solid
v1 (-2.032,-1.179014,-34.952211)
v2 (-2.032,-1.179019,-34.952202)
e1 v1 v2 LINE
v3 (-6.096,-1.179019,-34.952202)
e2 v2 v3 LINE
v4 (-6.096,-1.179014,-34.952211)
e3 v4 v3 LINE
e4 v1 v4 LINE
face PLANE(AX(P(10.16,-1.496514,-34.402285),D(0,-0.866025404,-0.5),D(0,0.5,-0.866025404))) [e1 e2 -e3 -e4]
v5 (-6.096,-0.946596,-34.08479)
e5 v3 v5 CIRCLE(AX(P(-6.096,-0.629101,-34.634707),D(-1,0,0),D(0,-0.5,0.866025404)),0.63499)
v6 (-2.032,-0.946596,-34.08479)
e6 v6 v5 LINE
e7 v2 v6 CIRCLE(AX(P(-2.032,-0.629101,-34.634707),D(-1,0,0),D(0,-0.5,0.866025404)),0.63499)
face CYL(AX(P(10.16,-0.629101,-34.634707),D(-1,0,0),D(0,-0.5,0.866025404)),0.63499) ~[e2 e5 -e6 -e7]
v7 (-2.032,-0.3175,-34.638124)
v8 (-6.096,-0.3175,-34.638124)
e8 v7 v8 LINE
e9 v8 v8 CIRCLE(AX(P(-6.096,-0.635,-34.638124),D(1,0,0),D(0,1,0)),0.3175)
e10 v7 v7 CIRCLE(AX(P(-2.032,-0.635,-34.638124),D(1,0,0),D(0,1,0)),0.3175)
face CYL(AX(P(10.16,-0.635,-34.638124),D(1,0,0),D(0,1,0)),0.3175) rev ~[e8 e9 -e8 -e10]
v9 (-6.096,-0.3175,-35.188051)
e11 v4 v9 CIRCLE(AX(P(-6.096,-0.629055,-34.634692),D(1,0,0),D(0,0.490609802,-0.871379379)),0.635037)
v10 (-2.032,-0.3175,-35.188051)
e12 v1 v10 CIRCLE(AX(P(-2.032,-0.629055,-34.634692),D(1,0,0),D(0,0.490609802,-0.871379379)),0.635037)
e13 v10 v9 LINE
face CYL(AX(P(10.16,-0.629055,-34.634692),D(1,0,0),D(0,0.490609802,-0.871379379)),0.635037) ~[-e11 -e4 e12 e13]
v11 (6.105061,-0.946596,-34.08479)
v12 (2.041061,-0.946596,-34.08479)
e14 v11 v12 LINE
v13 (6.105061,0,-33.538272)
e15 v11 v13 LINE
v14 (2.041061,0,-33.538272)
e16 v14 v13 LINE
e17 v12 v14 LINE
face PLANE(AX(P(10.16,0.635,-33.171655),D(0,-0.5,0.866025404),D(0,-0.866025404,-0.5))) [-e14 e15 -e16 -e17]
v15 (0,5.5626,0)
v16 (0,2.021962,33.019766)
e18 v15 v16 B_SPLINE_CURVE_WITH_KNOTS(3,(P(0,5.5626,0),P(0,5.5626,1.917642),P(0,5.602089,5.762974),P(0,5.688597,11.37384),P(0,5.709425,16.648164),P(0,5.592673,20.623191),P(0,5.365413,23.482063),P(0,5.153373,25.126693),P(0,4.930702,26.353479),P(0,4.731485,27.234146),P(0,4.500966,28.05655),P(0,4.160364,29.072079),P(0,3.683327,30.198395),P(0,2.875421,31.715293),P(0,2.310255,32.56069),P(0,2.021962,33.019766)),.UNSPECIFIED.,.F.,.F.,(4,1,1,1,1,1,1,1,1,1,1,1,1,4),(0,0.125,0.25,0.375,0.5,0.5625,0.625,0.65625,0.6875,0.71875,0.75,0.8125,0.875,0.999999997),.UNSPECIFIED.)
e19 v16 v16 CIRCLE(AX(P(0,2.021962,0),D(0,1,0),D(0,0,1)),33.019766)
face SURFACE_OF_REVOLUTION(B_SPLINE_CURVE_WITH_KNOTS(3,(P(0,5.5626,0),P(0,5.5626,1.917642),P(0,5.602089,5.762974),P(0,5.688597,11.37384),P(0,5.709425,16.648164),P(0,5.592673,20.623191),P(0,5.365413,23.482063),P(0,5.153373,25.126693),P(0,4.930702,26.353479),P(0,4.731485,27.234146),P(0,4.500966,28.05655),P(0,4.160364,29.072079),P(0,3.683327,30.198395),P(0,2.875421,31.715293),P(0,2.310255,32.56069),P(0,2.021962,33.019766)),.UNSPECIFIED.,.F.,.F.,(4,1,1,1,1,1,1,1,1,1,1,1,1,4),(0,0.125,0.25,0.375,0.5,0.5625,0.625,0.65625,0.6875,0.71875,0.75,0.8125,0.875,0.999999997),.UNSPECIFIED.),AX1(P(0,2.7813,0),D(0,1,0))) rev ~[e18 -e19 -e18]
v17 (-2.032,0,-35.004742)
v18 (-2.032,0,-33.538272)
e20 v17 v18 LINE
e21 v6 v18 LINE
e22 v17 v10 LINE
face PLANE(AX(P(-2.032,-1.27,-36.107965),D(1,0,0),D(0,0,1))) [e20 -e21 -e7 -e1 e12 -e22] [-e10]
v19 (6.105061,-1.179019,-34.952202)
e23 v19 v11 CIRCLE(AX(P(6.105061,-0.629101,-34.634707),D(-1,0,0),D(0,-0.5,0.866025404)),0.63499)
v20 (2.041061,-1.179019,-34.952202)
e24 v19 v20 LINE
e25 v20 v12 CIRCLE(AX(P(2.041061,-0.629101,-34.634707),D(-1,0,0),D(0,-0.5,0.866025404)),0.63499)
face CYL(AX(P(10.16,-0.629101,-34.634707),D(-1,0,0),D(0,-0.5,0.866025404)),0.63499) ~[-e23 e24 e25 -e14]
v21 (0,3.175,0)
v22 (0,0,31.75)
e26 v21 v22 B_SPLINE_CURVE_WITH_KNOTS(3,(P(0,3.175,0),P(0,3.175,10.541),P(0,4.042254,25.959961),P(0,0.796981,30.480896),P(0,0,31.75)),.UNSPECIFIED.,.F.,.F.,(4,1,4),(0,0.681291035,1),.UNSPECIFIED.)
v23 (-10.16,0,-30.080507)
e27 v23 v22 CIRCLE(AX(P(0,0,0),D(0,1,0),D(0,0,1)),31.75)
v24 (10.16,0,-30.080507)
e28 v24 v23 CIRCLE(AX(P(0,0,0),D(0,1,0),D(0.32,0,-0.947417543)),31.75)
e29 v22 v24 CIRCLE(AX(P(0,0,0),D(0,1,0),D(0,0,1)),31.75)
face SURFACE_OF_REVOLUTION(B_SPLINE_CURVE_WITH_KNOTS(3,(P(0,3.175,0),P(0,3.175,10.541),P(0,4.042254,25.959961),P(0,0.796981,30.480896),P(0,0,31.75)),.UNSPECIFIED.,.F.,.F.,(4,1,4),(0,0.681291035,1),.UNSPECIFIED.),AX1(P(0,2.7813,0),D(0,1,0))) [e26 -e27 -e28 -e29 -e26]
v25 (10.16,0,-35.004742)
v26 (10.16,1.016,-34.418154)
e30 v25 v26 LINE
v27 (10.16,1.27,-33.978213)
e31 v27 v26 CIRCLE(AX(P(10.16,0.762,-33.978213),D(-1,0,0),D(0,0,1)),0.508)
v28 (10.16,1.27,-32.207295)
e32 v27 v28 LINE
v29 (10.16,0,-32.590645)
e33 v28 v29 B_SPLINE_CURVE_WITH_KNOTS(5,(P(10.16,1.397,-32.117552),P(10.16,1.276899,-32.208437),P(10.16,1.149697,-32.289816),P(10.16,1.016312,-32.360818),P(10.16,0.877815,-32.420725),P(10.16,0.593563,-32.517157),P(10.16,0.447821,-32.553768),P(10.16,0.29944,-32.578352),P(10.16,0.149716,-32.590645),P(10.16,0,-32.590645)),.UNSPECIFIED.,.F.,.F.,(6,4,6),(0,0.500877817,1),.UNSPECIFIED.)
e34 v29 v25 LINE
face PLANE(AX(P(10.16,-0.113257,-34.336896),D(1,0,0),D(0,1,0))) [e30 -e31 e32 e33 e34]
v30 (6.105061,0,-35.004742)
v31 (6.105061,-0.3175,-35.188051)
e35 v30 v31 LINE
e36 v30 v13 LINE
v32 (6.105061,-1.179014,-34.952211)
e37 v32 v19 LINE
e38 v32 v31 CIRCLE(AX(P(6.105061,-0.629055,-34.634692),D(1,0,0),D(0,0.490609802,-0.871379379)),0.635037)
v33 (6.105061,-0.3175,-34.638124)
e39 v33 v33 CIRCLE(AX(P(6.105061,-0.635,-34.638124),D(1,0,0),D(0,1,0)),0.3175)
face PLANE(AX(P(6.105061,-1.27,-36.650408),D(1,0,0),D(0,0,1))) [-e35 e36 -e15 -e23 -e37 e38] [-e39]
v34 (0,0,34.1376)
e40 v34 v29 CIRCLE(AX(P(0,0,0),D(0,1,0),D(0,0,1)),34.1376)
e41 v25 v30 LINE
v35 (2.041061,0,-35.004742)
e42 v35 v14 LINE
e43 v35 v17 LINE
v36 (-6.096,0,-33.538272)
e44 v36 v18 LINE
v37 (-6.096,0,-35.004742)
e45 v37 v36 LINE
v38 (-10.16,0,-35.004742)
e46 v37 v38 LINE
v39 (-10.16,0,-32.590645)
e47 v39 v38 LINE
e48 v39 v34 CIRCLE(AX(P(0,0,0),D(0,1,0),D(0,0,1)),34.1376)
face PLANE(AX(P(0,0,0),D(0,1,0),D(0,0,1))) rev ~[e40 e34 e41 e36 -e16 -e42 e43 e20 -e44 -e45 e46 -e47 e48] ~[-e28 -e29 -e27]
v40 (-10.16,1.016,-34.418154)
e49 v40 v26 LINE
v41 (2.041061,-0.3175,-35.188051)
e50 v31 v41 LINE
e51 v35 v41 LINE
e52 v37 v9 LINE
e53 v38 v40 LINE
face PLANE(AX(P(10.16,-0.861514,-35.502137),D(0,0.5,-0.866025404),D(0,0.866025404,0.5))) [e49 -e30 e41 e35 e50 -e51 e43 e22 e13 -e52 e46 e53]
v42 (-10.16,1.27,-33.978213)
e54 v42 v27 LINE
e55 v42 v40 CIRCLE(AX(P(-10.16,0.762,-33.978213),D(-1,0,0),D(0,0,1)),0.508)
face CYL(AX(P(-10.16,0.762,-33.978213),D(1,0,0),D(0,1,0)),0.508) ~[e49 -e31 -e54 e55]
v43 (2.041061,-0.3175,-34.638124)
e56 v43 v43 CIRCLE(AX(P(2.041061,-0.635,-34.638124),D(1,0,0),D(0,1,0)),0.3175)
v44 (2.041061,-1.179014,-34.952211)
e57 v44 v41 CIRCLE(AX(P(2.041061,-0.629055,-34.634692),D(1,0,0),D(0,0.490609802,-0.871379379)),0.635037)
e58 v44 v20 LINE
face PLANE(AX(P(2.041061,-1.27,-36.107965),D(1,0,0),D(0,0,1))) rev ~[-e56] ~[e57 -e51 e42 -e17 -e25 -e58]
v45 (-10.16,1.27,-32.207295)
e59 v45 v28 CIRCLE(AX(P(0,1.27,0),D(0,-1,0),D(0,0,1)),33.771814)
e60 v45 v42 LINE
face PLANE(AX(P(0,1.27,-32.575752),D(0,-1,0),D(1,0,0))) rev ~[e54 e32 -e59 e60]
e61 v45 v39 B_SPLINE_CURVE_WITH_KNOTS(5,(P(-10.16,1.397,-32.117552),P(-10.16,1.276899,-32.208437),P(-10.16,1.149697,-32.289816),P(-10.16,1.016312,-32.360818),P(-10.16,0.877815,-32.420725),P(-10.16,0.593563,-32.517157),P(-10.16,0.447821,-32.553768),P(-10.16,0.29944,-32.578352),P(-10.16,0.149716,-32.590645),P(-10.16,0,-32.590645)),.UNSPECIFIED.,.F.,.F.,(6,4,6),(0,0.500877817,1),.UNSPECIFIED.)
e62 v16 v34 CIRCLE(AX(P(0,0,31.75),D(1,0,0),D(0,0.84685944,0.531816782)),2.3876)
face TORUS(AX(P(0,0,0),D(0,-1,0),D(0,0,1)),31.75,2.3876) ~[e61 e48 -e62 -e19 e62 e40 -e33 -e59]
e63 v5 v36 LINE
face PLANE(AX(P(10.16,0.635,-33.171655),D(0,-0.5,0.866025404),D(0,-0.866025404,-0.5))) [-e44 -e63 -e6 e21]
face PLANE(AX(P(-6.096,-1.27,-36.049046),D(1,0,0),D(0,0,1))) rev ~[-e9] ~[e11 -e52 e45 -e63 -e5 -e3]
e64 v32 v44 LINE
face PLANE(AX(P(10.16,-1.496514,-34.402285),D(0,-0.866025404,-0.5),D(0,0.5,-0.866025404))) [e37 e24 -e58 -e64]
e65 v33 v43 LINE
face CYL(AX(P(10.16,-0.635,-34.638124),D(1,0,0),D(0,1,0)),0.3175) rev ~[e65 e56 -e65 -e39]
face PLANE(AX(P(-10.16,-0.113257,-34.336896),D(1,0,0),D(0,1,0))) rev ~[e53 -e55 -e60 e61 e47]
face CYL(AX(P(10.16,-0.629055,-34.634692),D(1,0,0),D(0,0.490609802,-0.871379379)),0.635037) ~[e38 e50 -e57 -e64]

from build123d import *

# Parameters (mm, degrees)
F3_DEPTH  = 1.27
F5_DEPTH  = 20.32
F6_R      = 0.3175
F7_DEPTH  = 44.2986001
F8_R      = 0.63499
F10_W     = 4.064
F10_H     = 4.1974456223
F10_W_2   = 4.0730612593
F10_H_2   = 4.2563648137
F10_W_3   = 4.0549387407
F10_H_3   = 4.7988080594
F11_DEPTH = 1.27
F12_R     = 0.508


# Not quite as in the source:
# - a fillet or chamfer is up to 0.001 mm smaller than in the source, because OpenCascade refuses the exact size
# - the dataset's text gives a spline's control points without its knots; the knots are read off the source's solid


with BuildPart() as f1:
    # F0 (on Right) → F1 (revolve)
    with BuildSketch(Plane.YZ):
        with BuildLine():
            add(Edge.make_bspline(
                [(3.175, 0), (3.175, 10.541), (4.0422536131, 25.9599614942), (0.796980629, 30.4808964435), (0, 31.75)],
                knots=[0, 0, 0, 0, 0.6812910354, 1, 1, 1, 1], degree=3))
            Line((3.175, 0), (5.5626, 0))
            add(Edge.make_bspline(
                [(5.5626, 0), (5.5626, 1.9176420969), (5.6020893532, 5.762973782), (5.6885968485, 11.3738399623), (5.7094253413, 16.6481644408), (5.5926732239, 20.6231912945), (5.3654131178, 23.4820630282), (5.1533733603, 25.1266929623), (4.9307019402, 26.3534786039), (4.7314848723, 27.2341461126), (4.5009658464, 28.0565495549), (4.1603640769, 29.0720787187), (3.6833271227, 30.1983946783), (2.8754214133, 31.7152927686), (2.3102553011, 32.5606898933), (2.0219615984, 33.0197657478)],
                knots=[0, 0, 0, 0, 0.125, 0.25, 0.375, 0.5, 0.5625, 0.625, 0.65625, 0.6875, 0.71875, 0.75, 0.8125, 0.875, 0.9999999969, 0.9999999969, 0.9999999969, 0.9999999969], degree=3))
            ThreePointArc((2.0219615984, 33.0197657478), (1.1551928541, 33.8395366065), (0, 34.1376))
            Line((0, 34.1376), (0, 31.75))
        make_face()
    revolve(axis=Axis((0, 2.7813, 0), (0, 1, 0)))

    # F2 (on face) → F3 (join)
    with BuildSketch(Plane.XZ):
        with BuildLine():
            ThreePointArc((10.16, -30.0805069771), (0, -31.75), (-10.16, -30.0805069771))
            Line((-10.16, -30.0805069771), (-10.16, -34.2715069771))
            Line((-10.16, -34.2715069771), (10.16, -34.2715069771))
            Line((10.16, -34.2715069771), (10.16, -30.0805069771))
        make_face()
    extrude(amount=-F3_DEPTH)

    # F4 (on face) → F5 (join)
    with BuildSketch(Plane.YZ.offset(10.16)):
        Polygon((-0.8615136853, -35.5021369771), (1.27, -34.2715069771), (0.635, -33.1716547143), (-1.4965136853, -34.4022847143), align=None)
    extrude(amount=-F5_DEPTH)

    # F6 (on face) → F7 (cut, through all)
    with BuildSketch(Plane.YZ.offset(10.16)):
        with Locations((-0.635, -34.638124398)):
            Circle(F6_R)
        with BuildLine():
            Line((-0.8615136853, -35.5021369771), (-0.3175, -35.1880505294))
            ThreePointArc((-0.3175, -35.1880505294), (-0.7967279245, -35.2471937657), (-1.1790136853, -34.9522108457))
            Line((-1.1790136853, -34.9522108457), (-0.8615136853, -35.5021369771))
        make_face()
    extrude(amount=-F7_DEPTH, mode=Mode.SUBTRACT)

    # F8 (radius 0.635 in the source; OpenCascade refuses exactly that, so slightly less here)
    f8_edges = [f1.edges().sort_by_distance(p)[0] for p in [
        (0, -1.496514, -34.402285),
    ]]
    fillet(f8_edges, radius=F8_R)

    # F10 (on offset) → F11 (cut)
    with BuildSketch(Plane.XZ.offset(1.27)):
        with Locations((-8.128, -33.9503228112)):
            Rectangle(F10_W, F10_H)
        with Locations((0.0045306296, -33.9797824069)):
            Rectangle(F10_W_2, F10_H_2)
        with Locations((8.1325306296, -34.2510040297)):
            Rectangle(F10_W_3, F10_H_3)
    extrude(amount=-F11_DEPTH, mode=Mode.SUBTRACT)

    # F12
    f12_edges = [f1.edges().sort_by_distance(p)[0] for p in [
        (0, 1.27, -34.271507),
    ]]
    fillet(f12_edges, radius=F12_R)


solid = f1.part
